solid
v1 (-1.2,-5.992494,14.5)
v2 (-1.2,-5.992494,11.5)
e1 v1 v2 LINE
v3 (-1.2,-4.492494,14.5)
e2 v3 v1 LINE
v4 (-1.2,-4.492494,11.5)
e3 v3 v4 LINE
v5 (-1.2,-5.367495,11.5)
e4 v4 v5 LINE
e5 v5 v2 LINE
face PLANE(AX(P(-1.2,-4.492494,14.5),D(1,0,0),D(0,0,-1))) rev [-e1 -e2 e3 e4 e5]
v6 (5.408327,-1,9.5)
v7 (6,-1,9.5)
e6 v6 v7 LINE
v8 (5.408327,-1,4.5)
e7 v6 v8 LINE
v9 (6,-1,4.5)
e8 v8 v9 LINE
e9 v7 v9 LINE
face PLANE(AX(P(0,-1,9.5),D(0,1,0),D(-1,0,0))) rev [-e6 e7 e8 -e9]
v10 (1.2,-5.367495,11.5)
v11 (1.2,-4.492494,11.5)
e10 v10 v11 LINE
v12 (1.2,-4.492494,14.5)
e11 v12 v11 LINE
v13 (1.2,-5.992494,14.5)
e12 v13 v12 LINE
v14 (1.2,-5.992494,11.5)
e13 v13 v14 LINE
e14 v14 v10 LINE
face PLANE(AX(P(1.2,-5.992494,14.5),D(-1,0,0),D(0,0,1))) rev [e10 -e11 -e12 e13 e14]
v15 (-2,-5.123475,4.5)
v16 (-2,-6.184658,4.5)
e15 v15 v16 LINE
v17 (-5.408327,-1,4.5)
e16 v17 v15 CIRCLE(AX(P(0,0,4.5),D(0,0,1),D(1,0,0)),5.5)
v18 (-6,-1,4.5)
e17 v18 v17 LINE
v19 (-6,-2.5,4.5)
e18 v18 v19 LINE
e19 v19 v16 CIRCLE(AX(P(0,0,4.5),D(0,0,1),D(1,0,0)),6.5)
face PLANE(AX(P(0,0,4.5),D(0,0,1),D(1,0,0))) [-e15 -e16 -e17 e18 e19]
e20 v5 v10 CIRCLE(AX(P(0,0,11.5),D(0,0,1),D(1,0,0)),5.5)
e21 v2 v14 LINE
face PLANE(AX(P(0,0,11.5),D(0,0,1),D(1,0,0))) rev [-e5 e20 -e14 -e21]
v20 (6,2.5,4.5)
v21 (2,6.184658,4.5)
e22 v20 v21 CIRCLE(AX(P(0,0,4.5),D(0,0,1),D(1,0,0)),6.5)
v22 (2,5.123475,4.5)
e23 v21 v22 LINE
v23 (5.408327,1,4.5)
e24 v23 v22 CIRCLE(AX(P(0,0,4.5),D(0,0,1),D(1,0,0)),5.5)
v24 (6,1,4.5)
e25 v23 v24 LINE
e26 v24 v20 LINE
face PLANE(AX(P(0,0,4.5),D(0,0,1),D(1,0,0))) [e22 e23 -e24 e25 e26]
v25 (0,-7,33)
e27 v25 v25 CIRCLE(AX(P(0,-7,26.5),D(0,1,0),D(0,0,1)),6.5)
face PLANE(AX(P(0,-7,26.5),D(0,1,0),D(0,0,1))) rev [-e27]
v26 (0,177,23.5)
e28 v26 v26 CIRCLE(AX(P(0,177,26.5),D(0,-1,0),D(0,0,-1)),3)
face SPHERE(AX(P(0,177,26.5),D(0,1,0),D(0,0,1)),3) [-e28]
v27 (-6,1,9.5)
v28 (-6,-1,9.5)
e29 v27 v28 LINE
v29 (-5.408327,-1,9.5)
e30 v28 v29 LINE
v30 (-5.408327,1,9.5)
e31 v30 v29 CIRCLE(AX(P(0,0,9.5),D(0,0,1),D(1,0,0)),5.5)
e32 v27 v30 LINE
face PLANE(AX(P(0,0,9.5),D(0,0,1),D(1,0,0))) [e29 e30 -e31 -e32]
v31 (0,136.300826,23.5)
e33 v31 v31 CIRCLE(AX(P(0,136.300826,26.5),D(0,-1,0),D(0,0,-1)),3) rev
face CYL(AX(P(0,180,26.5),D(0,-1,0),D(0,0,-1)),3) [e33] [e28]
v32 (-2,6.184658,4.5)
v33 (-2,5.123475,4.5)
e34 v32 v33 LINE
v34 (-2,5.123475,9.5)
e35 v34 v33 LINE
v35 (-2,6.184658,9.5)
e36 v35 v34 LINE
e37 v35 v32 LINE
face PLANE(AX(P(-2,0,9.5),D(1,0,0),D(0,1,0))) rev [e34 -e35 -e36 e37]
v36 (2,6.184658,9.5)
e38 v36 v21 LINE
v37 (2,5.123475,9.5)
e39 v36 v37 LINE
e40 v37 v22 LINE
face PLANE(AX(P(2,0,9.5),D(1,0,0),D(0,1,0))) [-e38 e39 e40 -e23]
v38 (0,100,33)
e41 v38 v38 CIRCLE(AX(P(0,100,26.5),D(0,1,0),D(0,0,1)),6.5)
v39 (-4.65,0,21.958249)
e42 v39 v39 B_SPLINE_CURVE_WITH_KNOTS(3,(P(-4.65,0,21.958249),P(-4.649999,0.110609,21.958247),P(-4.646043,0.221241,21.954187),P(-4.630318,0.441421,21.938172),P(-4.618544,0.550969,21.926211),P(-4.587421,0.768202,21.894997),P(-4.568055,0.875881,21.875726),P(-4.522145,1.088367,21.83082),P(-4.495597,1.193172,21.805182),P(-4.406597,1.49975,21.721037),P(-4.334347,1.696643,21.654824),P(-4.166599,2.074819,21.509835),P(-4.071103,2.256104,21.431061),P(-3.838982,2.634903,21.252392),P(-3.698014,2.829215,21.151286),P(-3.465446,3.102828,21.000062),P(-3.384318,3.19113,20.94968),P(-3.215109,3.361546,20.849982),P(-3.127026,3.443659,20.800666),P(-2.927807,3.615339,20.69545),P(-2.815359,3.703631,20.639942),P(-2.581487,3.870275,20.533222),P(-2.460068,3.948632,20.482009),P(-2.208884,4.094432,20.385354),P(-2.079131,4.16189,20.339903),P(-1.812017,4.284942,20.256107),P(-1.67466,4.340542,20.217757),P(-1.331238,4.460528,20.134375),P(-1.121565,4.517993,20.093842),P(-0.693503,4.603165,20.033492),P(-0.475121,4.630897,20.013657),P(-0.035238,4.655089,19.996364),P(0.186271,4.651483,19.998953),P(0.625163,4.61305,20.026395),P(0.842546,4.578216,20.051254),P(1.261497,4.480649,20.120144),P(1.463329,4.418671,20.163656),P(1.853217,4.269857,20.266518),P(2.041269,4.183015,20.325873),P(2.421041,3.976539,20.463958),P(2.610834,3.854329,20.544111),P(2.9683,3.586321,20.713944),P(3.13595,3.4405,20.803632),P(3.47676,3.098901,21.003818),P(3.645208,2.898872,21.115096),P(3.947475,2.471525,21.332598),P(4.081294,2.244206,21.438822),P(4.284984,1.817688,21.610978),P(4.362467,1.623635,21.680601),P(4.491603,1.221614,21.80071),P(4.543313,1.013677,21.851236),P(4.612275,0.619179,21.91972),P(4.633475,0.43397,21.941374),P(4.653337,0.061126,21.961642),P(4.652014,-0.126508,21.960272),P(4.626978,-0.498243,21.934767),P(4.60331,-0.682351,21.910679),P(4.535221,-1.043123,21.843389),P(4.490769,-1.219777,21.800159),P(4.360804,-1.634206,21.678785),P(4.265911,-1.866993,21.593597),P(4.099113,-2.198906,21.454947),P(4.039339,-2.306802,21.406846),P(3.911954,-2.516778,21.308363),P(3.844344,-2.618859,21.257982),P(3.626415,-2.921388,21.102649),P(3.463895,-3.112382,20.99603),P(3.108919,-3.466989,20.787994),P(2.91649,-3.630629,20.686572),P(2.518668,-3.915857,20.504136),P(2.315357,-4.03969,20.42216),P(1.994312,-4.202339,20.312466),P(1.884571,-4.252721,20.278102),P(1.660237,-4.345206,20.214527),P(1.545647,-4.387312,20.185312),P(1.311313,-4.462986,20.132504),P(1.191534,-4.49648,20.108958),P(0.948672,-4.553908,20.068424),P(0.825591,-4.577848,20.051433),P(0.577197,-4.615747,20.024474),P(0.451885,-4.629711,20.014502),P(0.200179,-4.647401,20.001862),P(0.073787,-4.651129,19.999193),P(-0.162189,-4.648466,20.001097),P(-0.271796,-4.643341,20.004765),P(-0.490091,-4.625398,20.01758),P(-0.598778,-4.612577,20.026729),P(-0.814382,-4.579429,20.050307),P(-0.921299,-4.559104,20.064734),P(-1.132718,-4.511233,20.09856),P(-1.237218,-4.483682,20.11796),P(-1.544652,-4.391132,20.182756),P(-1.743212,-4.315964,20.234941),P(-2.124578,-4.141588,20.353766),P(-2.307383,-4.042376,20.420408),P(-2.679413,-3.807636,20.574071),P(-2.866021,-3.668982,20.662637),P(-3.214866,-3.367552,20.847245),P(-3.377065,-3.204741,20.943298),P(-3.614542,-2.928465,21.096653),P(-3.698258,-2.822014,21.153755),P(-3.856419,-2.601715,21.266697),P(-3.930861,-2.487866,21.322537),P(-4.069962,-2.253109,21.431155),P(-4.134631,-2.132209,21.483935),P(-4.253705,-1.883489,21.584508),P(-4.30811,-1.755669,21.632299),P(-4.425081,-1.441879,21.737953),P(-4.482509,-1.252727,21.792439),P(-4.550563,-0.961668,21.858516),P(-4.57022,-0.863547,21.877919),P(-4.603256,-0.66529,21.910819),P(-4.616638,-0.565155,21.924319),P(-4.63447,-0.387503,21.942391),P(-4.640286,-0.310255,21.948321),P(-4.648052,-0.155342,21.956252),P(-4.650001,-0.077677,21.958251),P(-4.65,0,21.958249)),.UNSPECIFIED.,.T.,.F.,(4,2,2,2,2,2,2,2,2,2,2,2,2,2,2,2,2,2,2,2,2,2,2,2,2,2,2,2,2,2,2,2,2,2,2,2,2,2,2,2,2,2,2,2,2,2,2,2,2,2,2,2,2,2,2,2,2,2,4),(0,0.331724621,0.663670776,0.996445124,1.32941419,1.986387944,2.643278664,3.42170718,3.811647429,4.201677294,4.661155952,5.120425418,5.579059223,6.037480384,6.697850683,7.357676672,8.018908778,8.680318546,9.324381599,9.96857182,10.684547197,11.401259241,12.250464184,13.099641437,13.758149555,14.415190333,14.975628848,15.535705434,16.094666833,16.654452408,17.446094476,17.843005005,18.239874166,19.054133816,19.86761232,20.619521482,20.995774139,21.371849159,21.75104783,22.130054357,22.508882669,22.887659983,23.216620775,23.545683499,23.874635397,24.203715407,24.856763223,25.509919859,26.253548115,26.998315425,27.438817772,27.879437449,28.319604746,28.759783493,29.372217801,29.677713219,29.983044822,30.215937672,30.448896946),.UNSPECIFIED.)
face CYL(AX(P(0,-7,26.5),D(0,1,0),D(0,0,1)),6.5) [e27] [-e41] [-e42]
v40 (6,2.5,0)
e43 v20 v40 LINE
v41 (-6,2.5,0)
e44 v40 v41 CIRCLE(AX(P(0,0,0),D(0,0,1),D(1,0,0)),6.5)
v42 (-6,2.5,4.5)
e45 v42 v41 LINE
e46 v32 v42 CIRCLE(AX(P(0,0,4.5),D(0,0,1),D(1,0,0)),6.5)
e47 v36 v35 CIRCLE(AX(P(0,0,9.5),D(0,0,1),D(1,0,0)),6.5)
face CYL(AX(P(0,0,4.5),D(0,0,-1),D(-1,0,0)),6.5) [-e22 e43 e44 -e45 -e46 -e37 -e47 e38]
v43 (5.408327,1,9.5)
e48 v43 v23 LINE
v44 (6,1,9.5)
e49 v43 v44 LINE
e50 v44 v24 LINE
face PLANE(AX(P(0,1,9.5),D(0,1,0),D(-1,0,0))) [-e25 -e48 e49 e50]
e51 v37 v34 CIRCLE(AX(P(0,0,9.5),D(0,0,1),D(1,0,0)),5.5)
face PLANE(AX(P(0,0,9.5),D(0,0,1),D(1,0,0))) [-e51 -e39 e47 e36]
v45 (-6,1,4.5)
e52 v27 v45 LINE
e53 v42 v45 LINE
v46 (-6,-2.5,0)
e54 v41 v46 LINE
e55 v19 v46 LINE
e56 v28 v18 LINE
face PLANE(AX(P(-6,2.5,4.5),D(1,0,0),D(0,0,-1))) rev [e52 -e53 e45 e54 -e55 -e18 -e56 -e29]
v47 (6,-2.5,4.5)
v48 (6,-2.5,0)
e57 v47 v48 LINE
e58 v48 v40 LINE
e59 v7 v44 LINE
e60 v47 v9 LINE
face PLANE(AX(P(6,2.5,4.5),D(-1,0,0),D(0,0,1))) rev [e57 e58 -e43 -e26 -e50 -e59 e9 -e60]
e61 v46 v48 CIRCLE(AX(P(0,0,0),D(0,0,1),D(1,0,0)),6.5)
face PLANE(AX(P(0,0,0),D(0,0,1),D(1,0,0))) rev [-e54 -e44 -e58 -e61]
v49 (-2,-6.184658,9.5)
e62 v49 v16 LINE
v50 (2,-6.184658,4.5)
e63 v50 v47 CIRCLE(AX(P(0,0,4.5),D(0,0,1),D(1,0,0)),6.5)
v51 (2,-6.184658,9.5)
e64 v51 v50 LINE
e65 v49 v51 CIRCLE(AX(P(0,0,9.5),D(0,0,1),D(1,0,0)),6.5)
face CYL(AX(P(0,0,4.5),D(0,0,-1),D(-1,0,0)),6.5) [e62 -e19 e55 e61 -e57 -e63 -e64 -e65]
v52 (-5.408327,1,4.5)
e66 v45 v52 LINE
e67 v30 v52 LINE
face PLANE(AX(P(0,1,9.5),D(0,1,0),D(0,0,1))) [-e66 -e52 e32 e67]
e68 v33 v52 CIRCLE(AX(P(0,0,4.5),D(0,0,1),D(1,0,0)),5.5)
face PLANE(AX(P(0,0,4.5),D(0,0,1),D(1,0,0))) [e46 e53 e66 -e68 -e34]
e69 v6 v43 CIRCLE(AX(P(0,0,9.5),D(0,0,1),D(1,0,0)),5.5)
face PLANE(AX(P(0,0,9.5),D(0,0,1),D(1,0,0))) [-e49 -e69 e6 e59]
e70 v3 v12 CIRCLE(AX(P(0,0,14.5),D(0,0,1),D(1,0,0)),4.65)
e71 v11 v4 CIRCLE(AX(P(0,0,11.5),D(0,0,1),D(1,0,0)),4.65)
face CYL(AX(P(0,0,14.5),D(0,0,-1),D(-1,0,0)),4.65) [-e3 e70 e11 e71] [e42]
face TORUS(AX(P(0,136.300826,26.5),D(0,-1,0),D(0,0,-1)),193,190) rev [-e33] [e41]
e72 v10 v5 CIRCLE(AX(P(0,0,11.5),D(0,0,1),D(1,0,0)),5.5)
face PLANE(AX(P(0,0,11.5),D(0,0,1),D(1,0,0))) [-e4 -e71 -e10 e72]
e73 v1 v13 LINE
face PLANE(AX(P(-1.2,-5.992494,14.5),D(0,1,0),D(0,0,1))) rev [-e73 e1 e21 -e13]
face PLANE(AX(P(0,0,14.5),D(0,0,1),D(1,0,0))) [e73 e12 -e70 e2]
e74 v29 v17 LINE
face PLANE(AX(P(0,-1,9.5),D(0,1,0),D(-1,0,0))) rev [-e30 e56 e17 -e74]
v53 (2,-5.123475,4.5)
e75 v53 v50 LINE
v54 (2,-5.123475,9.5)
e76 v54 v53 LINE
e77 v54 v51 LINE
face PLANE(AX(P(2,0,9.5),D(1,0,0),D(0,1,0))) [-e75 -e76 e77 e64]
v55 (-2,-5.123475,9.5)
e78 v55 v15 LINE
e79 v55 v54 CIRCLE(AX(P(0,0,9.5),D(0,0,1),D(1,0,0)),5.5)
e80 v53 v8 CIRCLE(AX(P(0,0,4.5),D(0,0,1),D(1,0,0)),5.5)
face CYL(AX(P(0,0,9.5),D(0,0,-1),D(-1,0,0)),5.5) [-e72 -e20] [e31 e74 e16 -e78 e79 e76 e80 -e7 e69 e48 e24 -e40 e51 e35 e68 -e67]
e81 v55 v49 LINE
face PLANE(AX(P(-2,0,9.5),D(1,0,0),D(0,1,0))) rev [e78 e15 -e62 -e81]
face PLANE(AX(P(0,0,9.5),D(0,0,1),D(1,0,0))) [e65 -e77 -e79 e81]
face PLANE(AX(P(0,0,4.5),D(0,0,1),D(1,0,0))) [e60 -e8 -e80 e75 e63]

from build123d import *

# Parameters (mm, degrees)
BOSS_EXTRUDE1_DEPTH      = 4.5
BOSS_EXTRUDE2_DEPTH      = 5
SKETCH3_R                = 5.5
BOSS_EXTRUDE3_DEPTH      = 2
BOSS_EXTRUDE4_DEPTH      = 3
SKETCH5_R                = 4.65
BOSS_EXTRUDE5_DEPTH      = 12
BOSS_EXTRUDE6_DEPTH      = 100
BOSS_EXTRUDE6_DEPTH_BACK = 7
SKETCH6_R                = 6.5
SKETCH7_R                = 3
BOSS_EXTRUDE7_DEPTH      = 80
FILLET1_R                = 190
FILLET2_R                = 3


with BuildPart() as part:
    # Sketch1 → Boss-Extrude1 (new body)
    with BuildSketch(Plane.XY):
        with BuildLine():
            Line((-6, 2.5), (-6, -2.5))
            ThreePointArc((-6, -2.5), (0, -6.5), (6, -2.5))
            Line((6, -2.5), (6, 2.5))
            ThreePointArc((6, 2.5), (0, 6.5), (-6, 2.5))
        make_face()
    extrude(amount=BOSS_EXTRUDE1_DEPTH)

    # Sketch2 → Boss-Extrude2 (add)
    with BuildSketch(Plane.XY.offset(4.5)):
        with BuildLine():
            ThreePointArc((2, 6.184658438), (0, 6.5), (-2, 6.184658438))
            Line((-2, 6.184658438), (-2, 5.123475383))
            ThreePointArc((-2, 5.123475383), (-4.239291123, 3.504056332), (-5.408326913, 1))
            Line((-5.408326913, 1), (-6, 1))
            Line((-6, 1), (-6, -1))
            Line((-6, -1), (-5.408326913, -1))
            ThreePointArc((-5.408326913, -1), (-4.239291123, -3.504056332), (-2, -5.123475383))
            Line((-2, -5.123475383), (-2, -6.184658438))
            ThreePointArc((-2, -6.184658438), (0, -6.5), (2, -6.184658438))
            Line((2, -6.184658438), (2, -5.123475383))
            ThreePointArc((2, -5.123475383), (4.239291123, -3.504056332), (5.408326913, -1))
            Line((5.408326913, -1), (6, -1))
            Line((6, -1), (6, 1))
            Line((6, 1), (5.408326913, 1))
            ThreePointArc((5.408326913, 1), (4.239291123, 3.504056332), (2, 5.123475383))
            Line((2, 5.123475383), (2, 6.184658438))
        make_face()
    extrude(amount=BOSS_EXTRUDE2_DEPTH)

    # Sketch3 → Boss-Extrude3 (add)
    with BuildSketch(Plane.XY.offset(9.5)):
        with Locations(Location((0, 0, 0), (0, 0, 169.524318304))):
            Circle(SKETCH3_R)
    extrude(amount=BOSS_EXTRUDE3_DEPTH)

    # Sketch4 → Boss-Extrude4 (add)
    with BuildSketch(Plane.XY.offset(11.5)):
        with BuildLine():
            Line((-1.2, -4.49249374), (-1.2, -5.99249374))
            Line((-1.2, -5.99249374), (1.2, -5.99249374))
            Line((1.2, -5.99249374), (1.2, -4.49249374))
            ThreePointArc((1.2, -4.49249374), (0, 4.65), (-1.2, -4.49249374))
        make_face()
    extrude(amount=BOSS_EXTRUDE4_DEPTH)

    # Sketch5 → Boss-Extrude5 (add)
    with BuildSketch(Plane.XY.offset(14.5)):
        with Locations(Location((0, 0, 0), (0, 0, 255.044751683))):
            Circle(SKETCH5_R)
    extrude(amount=BOSS_EXTRUDE5_DEPTH)

    # Sketch6 → Boss-Extrude6 (add, two sides: drawn at the far end of the back side and taken through both)
    with BuildSketch(Plane(origin=(0, 0, 0), x_dir=(1, 0, 0), z_dir=(0, 1, 0)).offset(-BOSS_EXTRUDE6_DEPTH_BACK)):
        with Locations(Location((0, -26.5, 0), (0, 0, 270))):
            Circle(SKETCH6_R)
    extrude(amount=BOSS_EXTRUDE6_DEPTH + BOSS_EXTRUDE6_DEPTH_BACK)

    # Sketch7 → Boss-Extrude7 (add)
    with BuildSketch(Plane(origin=(0, 100, 0), x_dir=(1, 0, 0), z_dir=(0, 1, 0))):
        with Locations(Location((0, -26.5, 0), (0, 0, 270))):
            Circle(SKETCH7_R)
    extrude(amount=BOSS_EXTRUDE7_DEPTH)

    # Fillet1
    # the kernel refuses this fillet: 190 mm, written as the material it adds along each edge
    with BuildSketch(Plane(origin=(0, 100, 26.5), x_dir=(0, 0, 1), z_dir=(-1, 0, 0))) as fillet1_piece_1:
        with BuildLine():
            CenterArc((193, 36.300826437), FILLET1_R, 180, 11.014474836)
            Line((3, 36.300826437), (0, 36.300826437))
            Line((0, 36.300826437), (0, 0))
            Line((0, 0), (3, -3.8))
            ThreePointArc((3, -3.8), (4.75, -3.8), (2.77, -0.726016529))
            Line((2.77, -0.726016529), (6.5, 0))
        make_face()
    revolve(axis=Axis((0, 100, 26.5), (0, 1, 0)))

    # Fillet2
    fillet2_edges = [part.edges().sort_by_distance(p)[0] for p in [
        (0, 180, 23.5),
    ]]
    fillet(fillet2_edges, radius=FILLET2_R)


solid = part.part
